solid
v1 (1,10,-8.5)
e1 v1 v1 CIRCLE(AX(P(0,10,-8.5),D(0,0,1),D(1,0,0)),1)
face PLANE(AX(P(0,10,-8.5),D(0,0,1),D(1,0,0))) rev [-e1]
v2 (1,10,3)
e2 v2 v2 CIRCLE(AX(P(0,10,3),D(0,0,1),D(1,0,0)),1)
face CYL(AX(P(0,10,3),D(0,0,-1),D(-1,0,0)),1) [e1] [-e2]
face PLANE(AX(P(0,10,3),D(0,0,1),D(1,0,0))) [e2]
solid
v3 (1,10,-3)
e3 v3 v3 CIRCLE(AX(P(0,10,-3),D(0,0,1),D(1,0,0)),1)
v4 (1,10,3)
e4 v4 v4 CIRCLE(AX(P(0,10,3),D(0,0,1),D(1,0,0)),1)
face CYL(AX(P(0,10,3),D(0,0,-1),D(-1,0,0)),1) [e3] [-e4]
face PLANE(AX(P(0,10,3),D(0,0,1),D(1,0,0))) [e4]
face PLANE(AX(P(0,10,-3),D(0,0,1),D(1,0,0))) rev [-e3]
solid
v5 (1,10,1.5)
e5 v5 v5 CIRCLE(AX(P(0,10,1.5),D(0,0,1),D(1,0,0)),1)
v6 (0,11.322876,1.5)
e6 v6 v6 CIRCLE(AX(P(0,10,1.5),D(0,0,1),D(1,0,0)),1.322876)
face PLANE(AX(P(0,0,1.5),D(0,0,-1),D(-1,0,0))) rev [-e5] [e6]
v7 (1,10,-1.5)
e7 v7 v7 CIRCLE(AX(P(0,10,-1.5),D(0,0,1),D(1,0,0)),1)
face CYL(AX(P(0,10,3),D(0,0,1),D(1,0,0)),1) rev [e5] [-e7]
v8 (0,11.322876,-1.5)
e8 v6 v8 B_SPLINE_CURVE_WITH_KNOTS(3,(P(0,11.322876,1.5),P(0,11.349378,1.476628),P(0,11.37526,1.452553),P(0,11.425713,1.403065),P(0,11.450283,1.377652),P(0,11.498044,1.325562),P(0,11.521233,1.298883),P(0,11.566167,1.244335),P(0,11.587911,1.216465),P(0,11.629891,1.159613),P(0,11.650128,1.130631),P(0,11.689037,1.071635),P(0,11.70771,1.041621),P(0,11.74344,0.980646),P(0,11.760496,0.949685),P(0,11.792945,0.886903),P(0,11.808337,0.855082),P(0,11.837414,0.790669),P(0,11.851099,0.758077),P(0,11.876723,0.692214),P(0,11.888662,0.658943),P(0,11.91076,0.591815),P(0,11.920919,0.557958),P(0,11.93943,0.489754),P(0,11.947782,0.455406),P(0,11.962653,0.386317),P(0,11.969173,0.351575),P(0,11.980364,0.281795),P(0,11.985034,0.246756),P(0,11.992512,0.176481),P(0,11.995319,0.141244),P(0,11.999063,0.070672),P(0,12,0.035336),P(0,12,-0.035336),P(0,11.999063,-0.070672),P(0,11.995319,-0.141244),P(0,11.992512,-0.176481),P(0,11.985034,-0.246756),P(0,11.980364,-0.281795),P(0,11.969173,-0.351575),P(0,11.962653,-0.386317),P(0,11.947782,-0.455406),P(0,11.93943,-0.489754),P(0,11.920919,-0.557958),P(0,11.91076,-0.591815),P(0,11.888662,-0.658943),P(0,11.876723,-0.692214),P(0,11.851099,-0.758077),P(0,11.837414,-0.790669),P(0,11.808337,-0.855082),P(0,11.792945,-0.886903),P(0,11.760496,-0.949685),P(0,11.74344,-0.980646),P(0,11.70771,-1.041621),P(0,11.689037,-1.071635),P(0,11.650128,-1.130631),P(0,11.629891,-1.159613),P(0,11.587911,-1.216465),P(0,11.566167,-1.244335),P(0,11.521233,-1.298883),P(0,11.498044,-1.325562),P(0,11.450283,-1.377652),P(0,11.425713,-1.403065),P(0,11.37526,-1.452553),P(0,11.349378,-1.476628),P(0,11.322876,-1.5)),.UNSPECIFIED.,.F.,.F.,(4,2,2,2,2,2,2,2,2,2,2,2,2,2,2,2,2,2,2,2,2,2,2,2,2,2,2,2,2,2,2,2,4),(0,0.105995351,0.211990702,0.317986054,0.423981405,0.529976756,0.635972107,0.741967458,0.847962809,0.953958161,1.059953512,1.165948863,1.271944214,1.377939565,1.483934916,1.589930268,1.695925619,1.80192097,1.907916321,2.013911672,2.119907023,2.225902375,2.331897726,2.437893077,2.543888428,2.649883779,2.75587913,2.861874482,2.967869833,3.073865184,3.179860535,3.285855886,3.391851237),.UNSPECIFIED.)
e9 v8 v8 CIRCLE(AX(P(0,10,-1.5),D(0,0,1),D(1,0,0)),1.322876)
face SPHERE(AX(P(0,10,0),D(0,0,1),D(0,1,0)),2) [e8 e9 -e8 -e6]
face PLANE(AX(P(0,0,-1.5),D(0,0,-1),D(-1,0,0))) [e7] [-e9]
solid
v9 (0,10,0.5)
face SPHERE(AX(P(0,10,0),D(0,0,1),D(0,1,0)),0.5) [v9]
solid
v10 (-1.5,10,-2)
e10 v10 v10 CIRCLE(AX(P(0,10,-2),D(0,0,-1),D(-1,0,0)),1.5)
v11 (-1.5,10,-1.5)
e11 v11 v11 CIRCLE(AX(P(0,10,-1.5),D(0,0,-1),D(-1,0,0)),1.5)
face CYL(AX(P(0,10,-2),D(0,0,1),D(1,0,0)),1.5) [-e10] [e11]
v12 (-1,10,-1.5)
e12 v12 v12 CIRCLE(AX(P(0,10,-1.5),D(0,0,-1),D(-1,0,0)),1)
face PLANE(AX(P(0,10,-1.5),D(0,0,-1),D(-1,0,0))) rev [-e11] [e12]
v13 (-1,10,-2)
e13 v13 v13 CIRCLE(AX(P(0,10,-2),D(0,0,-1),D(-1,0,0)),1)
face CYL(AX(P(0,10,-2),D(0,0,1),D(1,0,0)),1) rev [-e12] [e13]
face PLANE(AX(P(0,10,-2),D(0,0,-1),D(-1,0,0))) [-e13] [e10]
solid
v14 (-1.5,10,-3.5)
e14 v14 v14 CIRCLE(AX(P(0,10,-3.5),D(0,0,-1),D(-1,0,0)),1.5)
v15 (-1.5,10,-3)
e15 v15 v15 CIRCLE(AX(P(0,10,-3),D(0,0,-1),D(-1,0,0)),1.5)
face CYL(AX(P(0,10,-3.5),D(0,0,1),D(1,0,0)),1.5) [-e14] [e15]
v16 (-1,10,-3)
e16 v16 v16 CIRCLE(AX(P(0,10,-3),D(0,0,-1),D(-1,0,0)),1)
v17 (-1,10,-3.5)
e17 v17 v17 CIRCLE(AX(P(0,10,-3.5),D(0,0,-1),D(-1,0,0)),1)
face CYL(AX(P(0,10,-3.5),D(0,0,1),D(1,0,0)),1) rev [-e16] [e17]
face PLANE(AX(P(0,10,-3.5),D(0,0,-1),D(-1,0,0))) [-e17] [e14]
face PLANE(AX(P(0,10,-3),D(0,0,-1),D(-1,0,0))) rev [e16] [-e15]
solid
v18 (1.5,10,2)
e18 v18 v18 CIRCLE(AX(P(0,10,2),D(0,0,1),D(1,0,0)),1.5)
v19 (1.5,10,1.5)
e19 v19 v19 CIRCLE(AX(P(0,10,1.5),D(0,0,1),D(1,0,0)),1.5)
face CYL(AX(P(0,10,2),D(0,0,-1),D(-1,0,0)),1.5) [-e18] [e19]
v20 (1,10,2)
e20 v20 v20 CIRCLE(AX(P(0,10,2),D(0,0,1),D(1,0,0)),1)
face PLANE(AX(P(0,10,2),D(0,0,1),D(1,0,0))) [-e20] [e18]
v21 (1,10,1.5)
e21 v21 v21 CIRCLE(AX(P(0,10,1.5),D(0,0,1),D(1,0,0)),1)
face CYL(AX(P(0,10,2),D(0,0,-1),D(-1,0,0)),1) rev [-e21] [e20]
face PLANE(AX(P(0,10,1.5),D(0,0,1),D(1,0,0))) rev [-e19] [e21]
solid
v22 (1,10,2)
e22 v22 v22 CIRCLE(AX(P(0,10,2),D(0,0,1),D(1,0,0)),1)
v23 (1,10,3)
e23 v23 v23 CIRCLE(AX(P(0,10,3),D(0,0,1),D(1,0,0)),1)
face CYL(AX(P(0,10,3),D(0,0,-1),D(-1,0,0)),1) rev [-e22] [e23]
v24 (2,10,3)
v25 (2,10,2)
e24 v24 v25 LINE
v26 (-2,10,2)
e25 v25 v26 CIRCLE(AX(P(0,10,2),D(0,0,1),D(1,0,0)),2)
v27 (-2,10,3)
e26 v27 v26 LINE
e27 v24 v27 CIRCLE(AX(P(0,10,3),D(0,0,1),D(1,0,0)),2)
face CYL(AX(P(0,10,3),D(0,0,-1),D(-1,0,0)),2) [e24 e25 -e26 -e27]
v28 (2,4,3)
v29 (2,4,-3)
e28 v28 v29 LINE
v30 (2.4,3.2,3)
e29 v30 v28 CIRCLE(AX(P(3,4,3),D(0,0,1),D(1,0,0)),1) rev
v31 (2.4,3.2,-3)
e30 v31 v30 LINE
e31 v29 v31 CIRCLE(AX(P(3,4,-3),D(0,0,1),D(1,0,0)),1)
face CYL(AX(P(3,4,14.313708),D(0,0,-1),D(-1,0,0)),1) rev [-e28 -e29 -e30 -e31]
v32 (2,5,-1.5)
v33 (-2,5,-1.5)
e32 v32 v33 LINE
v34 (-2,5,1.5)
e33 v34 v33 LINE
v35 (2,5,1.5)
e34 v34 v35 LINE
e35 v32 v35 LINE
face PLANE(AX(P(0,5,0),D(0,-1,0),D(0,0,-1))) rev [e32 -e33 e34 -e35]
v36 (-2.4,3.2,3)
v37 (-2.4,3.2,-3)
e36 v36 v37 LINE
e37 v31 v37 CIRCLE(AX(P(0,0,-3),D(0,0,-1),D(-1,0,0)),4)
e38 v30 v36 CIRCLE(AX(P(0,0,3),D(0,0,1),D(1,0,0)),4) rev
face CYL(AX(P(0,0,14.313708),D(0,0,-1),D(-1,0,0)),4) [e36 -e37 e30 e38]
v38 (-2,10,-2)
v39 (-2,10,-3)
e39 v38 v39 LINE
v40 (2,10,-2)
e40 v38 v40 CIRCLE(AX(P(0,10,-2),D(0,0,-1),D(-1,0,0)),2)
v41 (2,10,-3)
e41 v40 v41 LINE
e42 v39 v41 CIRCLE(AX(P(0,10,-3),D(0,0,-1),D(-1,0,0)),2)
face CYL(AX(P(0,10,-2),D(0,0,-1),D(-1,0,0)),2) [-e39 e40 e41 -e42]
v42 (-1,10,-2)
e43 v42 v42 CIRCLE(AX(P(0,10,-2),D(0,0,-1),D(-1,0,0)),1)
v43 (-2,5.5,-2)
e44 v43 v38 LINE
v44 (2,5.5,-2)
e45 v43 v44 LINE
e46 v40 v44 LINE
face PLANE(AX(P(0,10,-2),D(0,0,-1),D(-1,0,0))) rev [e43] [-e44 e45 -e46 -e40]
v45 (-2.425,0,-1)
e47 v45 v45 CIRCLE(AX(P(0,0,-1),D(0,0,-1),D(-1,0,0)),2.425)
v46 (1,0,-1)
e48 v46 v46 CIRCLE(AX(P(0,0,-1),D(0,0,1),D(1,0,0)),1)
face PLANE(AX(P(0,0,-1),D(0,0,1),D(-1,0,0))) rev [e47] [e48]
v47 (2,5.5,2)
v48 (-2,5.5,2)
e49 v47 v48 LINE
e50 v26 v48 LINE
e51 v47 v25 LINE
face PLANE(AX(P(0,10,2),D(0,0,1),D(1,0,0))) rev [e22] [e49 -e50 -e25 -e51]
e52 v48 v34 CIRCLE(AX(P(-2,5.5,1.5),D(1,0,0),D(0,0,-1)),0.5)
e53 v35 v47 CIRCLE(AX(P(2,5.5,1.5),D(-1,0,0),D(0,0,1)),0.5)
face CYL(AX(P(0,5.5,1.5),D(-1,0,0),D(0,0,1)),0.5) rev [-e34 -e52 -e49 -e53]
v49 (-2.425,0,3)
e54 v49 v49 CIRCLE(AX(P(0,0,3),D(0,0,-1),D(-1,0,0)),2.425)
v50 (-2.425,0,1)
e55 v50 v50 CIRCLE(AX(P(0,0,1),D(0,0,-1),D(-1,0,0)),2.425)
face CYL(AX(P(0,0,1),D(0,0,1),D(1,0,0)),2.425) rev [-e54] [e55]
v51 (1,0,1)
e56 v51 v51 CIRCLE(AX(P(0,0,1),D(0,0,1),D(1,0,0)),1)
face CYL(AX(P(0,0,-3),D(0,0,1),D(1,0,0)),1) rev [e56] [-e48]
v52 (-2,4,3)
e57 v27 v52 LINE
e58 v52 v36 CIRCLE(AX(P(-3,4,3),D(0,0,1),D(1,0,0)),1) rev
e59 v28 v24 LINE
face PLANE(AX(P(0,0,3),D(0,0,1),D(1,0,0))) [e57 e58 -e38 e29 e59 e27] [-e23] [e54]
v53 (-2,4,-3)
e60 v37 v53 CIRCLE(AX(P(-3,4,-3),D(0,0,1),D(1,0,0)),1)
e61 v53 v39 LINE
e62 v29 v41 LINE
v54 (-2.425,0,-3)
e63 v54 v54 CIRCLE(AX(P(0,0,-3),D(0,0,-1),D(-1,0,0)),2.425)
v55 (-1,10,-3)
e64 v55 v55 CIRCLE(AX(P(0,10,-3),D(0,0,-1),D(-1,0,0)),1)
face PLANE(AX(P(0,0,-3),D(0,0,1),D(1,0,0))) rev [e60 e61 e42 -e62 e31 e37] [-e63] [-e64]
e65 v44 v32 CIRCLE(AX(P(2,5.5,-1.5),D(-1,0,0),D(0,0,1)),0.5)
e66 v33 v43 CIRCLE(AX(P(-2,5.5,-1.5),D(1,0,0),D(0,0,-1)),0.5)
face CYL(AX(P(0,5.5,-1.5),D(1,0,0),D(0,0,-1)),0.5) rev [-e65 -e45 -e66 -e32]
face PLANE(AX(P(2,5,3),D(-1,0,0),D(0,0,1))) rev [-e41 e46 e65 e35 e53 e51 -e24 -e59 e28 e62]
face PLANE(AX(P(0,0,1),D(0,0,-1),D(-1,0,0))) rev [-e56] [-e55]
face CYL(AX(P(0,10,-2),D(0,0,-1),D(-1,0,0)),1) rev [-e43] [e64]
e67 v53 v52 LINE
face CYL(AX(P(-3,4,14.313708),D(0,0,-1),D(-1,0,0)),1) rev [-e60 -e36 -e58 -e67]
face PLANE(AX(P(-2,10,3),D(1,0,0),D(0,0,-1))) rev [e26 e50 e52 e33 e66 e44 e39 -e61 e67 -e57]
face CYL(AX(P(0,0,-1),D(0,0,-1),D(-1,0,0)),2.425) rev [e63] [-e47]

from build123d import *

# Parameters (mm, degrees)
SKETCH_1_R            = 1
EXTRUDE_1_DEPTH       = 3
SKETCH_1_R_2          = 2
EXTRUDE_1_2_DEPTH     = 3
EXTRUDE_START         = 2
SKETCH_2_R            = 1
EXTRUDE_2_DEPTH       = 1
SKETCH_3_R            = 1
EXTRUDE_3_DEPTH       = 1
EXTRUDE_4_REACH       = 9.874
EXTRUDE_4_END_RADIUS  = 2
SKETCH_4_W            = 4
SKETCH_4_H            = 6
SKETCH_6_R            = 4
EXTRUDE_5_DEPTH       = 6
SKETCH_7_R            = 2.425
CUT_EXTRUDE_2_DEPTH   = 2
SKETCH_8_R            = 1
CUT_EXTRUDE_3_DEPTH   = 14.266499161
FILLET_3_R            = 1
FILLET_2_R            = 0.5
SKETCH_9_R            = 1
EXTRUDE_6_DEPTH       = 3
SKETCH_11_R           = 1.5
SKETCH_11_R_2         = 1
EXTRUDE_7_DEPTH       = 0.5
SKETCH_12_R           = 1.5
SKETCH_12_R_2         = 1
EXTRUDE_8_DEPTH       = 0.5
MOVE_START            = -8.5
MOVE_FACE_1_OUTLINE_R = 1
MOVE_FACE_1_DEPTH     = 5.5


# Read off the part's stored shape, not the designer's step: 移动面1
with BuildPart() as part:
    # 草图1 → 凸台-拉伸1 (new, symmetric)
    with BuildSketch(Plane.XY):
        with Locations((0, 10)):
            Circle(SKETCH_1_R)
    extrude(amount=EXTRUDE_1_DEPTH, both=True)


with BuildPart() as body_2:
    # 草图1 → Extrude 1 2 (new, symmetric)
    with BuildSketch(Plane.XY):
        Circle(SKETCH_1_R_2)
        Circle(SKETCH_1_R, mode=Mode.SUBTRACT)
    extrude(amount=EXTRUDE_1_2_DEPTH, both=True)



with BuildPart() as body_3:
    # 草图2 → 凸台-拉伸2 (new body)
    with BuildSketch(Plane.XY.offset(EXTRUDE_START)):
        with BuildLine():
            Line((-2, 10), (-2, 5))
            Line((-2, 5), (2, 5))
            Line((2, 5), (2, 10))
            ThreePointArc((2, 10), (0, 12), (-2, 10))
        make_face()
        with Locations((0, 10)):
            Circle(SKETCH_2_R, mode=Mode.SUBTRACT)
    extrude(amount=EXTRUDE_2_DEPTH)



with BuildPart() as body_4:
    # 草图3 → 凸台-拉伸3 (new body)
    with BuildSketch(Plane(origin=(0, 0, -3), x_dir=(-1, 0, 0), z_dir=(0, 0, -1))):
        with BuildLine():
            Line((2, 5), (2, 10))
            ThreePointArc((2, 10), (0, 12), (-2, 10))
            Line((-2, 10), (-2, 5))
            Line((-2, 5), (2, 5))
        make_face()
        with Locations(Location((0, 10, 0), (0, 0, 180))):
            Circle(SKETCH_3_R, mode=Mode.SUBTRACT)
    extrude(amount=-EXTRUDE_3_DEPTH)


with BuildPart() as body_3_1:
    add(body_3.part)

    add(body_4.part)  # 凸台-拉伸4 merges body 4
    # 凸台-拉伸4: up to this cylinder (the profile starts outside it)
    extrude_4_end = Plane(origin=(0, 0, 0), z_dir=(0, 0, -1)) * Cylinder(EXTRUDE_4_END_RADIUS, 24.748, mode=Mode.PRIVATE)
    # 草图4 → 凸台-拉伸4 (add, up to the surface)
    with BuildSketch(Plane.XZ.offset(-5), mode=Mode.PRIVATE) as extrude_4_sk1:
        Rectangle(SKETCH_4_W, SKETCH_4_H)
    extrude_4_tool1 = extrude(extrude_4_sk1.sketch, amount=EXTRUDE_4_REACH, mode=Mode.PRIVATE) - extrude_4_end
    add(extrude_4_tool1.solids().sort_by_distance((0, 5, 0))[0])


with BuildPart() as body_4_2:
    # 草图5 → 旋转1 (revolve)
    with BuildSketch(Plane(origin=(0, 0, 0), x_dir=(0, 0, -1), z_dir=(1, 0, 0))):
        with BuildLine():
            Line((-0.5, 10), (0.5, 10))
            ThreePointArc((0.5, 10), (0, 10.5), (-0.5, 10))
        make_face()
    revolve(axis=Axis((0, 10, 2), (0, 0, -1)))


with BuildPart() as body_2_1:
    add(body_2.part)

    add(body_3_1.part)  # 凸台-拉伸5 merges body 3
    # 草图6 → 凸台-拉伸5 (add)
    with BuildSketch(Plane(origin=(0, 0, -3), x_dir=(-1, 0, 0), z_dir=(0, 0, -1))):
        Circle(SKETCH_6_R)
    extrude(amount=-EXTRUDE_5_DEPTH)

    # 草图7 → 切除-拉伸2 (cut)
    with BuildSketch(Plane(origin=(0, 0, 3), x_dir=(-1, 0, 0), z_dir=(0, 0, -1))):
        Circle(SKETCH_7_R)
    cut_extrude_2 = extrude(amount=CUT_EXTRUDE_2_DEPTH, mode=Mode.SUBTRACT)

    # 镜向1: 切除-拉伸2 across plane
    add(cut_extrude_2.mirror(Plane.XY), mode=Mode.SUBTRACT)

    # 草图8 → 切除-拉伸3 (cut, through all)
    with BuildSketch(Plane.XY.offset(1)):
        Circle(SKETCH_8_R)
    extrude(amount=-CUT_EXTRUDE_3_DEPTH, mode=Mode.SUBTRACT)

    # 圆角3
    fillet_3_edges = [body_2_1.edges().sort_by_distance(p)[0] for p in [
        (-2, 3.464101615, 0),
        (2, 3.464101615, 0),
    ]]
    fillet(fillet_3_edges, radius=FILLET_3_R)

    # 圆角2
    fillet_2_edges = [body_2_1.edges().sort_by_distance(p)[0] for p in [
        (0, 5, -2),
        (0, 5, 2),
    ]]
    fillet(fillet_2_edges, radius=FILLET_2_R)


with BuildPart() as body_4_3:
    # 草图9 → 凸台-拉伸6 (new, symmetric)
    with BuildSketch(Plane.XY):
        with Locations((0, 10)):
            Circle(SKETCH_9_R)
    extrude(amount=EXTRUDE_6_DEPTH, both=True)

    # Move Face 1 outline → Move Face 1 (add)
    with BuildSketch(Plane.XY.offset(MOVE_START)):
        with Locations((0, 10)):
            Circle(MOVE_FACE_1_OUTLINE_R)
    extrude(amount=MOVE_FACE_1_DEPTH)


with BuildPart() as body_5:
    # 草图10 → 旋转2 (revolve)
    with BuildSketch(Plane(origin=(0, 0, 0), x_dir=(0, 0, -1), z_dir=(1, 0, 0))):
        with BuildLine():
            ThreePointArc((1.5, 11.322875656), (0, 12), (-1.5, 11.322875656))
            Line((-1.5, 11.322875656), (-1.5, 11))
            Line((-1.5, 11), (1.5, 11))
            Line((1.5, 11), (1.5, 11.322875656))
        make_face()
    revolve(axis=Axis((0, 10, 3), (0, 0, -1)))


with BuildPart() as body_6:
    # 草图11 → 凸台-拉伸7 (new body)
    with BuildSketch(Plane.XY.offset(1.5)):
        with Locations((0, 10)):
            Circle(SKETCH_11_R)
        with Locations((0, 10)):
            Circle(SKETCH_11_R_2, mode=Mode.SUBTRACT)
    extrude(amount=EXTRUDE_7_DEPTH)


with BuildPart() as body_7:
    # 草图12 → 凸台-拉伸8 (new body)
    with BuildSketch(Plane(origin=(0, 0, -1.5), x_dir=(-1, 0, 0), z_dir=(0, 0, -1))):
        with Locations((0, 10)):
            Circle(SKETCH_12_R)
        with Locations((0, 10)):
            Circle(SKETCH_12_R_2, mode=Mode.SUBTRACT)
    extrude(amount=EXTRUDE_8_DEPTH)


with BuildPart() as body_8:
    # Move Body 1: copy of body 7
    add(body_7.part.moved(Location((0, 0, -1.5))))


solid = Compound([part.part, body_4_2.part, body_2_1.part, body_4_3.part, body_5.part, body_6.part, body_7.part, body_8.part])
